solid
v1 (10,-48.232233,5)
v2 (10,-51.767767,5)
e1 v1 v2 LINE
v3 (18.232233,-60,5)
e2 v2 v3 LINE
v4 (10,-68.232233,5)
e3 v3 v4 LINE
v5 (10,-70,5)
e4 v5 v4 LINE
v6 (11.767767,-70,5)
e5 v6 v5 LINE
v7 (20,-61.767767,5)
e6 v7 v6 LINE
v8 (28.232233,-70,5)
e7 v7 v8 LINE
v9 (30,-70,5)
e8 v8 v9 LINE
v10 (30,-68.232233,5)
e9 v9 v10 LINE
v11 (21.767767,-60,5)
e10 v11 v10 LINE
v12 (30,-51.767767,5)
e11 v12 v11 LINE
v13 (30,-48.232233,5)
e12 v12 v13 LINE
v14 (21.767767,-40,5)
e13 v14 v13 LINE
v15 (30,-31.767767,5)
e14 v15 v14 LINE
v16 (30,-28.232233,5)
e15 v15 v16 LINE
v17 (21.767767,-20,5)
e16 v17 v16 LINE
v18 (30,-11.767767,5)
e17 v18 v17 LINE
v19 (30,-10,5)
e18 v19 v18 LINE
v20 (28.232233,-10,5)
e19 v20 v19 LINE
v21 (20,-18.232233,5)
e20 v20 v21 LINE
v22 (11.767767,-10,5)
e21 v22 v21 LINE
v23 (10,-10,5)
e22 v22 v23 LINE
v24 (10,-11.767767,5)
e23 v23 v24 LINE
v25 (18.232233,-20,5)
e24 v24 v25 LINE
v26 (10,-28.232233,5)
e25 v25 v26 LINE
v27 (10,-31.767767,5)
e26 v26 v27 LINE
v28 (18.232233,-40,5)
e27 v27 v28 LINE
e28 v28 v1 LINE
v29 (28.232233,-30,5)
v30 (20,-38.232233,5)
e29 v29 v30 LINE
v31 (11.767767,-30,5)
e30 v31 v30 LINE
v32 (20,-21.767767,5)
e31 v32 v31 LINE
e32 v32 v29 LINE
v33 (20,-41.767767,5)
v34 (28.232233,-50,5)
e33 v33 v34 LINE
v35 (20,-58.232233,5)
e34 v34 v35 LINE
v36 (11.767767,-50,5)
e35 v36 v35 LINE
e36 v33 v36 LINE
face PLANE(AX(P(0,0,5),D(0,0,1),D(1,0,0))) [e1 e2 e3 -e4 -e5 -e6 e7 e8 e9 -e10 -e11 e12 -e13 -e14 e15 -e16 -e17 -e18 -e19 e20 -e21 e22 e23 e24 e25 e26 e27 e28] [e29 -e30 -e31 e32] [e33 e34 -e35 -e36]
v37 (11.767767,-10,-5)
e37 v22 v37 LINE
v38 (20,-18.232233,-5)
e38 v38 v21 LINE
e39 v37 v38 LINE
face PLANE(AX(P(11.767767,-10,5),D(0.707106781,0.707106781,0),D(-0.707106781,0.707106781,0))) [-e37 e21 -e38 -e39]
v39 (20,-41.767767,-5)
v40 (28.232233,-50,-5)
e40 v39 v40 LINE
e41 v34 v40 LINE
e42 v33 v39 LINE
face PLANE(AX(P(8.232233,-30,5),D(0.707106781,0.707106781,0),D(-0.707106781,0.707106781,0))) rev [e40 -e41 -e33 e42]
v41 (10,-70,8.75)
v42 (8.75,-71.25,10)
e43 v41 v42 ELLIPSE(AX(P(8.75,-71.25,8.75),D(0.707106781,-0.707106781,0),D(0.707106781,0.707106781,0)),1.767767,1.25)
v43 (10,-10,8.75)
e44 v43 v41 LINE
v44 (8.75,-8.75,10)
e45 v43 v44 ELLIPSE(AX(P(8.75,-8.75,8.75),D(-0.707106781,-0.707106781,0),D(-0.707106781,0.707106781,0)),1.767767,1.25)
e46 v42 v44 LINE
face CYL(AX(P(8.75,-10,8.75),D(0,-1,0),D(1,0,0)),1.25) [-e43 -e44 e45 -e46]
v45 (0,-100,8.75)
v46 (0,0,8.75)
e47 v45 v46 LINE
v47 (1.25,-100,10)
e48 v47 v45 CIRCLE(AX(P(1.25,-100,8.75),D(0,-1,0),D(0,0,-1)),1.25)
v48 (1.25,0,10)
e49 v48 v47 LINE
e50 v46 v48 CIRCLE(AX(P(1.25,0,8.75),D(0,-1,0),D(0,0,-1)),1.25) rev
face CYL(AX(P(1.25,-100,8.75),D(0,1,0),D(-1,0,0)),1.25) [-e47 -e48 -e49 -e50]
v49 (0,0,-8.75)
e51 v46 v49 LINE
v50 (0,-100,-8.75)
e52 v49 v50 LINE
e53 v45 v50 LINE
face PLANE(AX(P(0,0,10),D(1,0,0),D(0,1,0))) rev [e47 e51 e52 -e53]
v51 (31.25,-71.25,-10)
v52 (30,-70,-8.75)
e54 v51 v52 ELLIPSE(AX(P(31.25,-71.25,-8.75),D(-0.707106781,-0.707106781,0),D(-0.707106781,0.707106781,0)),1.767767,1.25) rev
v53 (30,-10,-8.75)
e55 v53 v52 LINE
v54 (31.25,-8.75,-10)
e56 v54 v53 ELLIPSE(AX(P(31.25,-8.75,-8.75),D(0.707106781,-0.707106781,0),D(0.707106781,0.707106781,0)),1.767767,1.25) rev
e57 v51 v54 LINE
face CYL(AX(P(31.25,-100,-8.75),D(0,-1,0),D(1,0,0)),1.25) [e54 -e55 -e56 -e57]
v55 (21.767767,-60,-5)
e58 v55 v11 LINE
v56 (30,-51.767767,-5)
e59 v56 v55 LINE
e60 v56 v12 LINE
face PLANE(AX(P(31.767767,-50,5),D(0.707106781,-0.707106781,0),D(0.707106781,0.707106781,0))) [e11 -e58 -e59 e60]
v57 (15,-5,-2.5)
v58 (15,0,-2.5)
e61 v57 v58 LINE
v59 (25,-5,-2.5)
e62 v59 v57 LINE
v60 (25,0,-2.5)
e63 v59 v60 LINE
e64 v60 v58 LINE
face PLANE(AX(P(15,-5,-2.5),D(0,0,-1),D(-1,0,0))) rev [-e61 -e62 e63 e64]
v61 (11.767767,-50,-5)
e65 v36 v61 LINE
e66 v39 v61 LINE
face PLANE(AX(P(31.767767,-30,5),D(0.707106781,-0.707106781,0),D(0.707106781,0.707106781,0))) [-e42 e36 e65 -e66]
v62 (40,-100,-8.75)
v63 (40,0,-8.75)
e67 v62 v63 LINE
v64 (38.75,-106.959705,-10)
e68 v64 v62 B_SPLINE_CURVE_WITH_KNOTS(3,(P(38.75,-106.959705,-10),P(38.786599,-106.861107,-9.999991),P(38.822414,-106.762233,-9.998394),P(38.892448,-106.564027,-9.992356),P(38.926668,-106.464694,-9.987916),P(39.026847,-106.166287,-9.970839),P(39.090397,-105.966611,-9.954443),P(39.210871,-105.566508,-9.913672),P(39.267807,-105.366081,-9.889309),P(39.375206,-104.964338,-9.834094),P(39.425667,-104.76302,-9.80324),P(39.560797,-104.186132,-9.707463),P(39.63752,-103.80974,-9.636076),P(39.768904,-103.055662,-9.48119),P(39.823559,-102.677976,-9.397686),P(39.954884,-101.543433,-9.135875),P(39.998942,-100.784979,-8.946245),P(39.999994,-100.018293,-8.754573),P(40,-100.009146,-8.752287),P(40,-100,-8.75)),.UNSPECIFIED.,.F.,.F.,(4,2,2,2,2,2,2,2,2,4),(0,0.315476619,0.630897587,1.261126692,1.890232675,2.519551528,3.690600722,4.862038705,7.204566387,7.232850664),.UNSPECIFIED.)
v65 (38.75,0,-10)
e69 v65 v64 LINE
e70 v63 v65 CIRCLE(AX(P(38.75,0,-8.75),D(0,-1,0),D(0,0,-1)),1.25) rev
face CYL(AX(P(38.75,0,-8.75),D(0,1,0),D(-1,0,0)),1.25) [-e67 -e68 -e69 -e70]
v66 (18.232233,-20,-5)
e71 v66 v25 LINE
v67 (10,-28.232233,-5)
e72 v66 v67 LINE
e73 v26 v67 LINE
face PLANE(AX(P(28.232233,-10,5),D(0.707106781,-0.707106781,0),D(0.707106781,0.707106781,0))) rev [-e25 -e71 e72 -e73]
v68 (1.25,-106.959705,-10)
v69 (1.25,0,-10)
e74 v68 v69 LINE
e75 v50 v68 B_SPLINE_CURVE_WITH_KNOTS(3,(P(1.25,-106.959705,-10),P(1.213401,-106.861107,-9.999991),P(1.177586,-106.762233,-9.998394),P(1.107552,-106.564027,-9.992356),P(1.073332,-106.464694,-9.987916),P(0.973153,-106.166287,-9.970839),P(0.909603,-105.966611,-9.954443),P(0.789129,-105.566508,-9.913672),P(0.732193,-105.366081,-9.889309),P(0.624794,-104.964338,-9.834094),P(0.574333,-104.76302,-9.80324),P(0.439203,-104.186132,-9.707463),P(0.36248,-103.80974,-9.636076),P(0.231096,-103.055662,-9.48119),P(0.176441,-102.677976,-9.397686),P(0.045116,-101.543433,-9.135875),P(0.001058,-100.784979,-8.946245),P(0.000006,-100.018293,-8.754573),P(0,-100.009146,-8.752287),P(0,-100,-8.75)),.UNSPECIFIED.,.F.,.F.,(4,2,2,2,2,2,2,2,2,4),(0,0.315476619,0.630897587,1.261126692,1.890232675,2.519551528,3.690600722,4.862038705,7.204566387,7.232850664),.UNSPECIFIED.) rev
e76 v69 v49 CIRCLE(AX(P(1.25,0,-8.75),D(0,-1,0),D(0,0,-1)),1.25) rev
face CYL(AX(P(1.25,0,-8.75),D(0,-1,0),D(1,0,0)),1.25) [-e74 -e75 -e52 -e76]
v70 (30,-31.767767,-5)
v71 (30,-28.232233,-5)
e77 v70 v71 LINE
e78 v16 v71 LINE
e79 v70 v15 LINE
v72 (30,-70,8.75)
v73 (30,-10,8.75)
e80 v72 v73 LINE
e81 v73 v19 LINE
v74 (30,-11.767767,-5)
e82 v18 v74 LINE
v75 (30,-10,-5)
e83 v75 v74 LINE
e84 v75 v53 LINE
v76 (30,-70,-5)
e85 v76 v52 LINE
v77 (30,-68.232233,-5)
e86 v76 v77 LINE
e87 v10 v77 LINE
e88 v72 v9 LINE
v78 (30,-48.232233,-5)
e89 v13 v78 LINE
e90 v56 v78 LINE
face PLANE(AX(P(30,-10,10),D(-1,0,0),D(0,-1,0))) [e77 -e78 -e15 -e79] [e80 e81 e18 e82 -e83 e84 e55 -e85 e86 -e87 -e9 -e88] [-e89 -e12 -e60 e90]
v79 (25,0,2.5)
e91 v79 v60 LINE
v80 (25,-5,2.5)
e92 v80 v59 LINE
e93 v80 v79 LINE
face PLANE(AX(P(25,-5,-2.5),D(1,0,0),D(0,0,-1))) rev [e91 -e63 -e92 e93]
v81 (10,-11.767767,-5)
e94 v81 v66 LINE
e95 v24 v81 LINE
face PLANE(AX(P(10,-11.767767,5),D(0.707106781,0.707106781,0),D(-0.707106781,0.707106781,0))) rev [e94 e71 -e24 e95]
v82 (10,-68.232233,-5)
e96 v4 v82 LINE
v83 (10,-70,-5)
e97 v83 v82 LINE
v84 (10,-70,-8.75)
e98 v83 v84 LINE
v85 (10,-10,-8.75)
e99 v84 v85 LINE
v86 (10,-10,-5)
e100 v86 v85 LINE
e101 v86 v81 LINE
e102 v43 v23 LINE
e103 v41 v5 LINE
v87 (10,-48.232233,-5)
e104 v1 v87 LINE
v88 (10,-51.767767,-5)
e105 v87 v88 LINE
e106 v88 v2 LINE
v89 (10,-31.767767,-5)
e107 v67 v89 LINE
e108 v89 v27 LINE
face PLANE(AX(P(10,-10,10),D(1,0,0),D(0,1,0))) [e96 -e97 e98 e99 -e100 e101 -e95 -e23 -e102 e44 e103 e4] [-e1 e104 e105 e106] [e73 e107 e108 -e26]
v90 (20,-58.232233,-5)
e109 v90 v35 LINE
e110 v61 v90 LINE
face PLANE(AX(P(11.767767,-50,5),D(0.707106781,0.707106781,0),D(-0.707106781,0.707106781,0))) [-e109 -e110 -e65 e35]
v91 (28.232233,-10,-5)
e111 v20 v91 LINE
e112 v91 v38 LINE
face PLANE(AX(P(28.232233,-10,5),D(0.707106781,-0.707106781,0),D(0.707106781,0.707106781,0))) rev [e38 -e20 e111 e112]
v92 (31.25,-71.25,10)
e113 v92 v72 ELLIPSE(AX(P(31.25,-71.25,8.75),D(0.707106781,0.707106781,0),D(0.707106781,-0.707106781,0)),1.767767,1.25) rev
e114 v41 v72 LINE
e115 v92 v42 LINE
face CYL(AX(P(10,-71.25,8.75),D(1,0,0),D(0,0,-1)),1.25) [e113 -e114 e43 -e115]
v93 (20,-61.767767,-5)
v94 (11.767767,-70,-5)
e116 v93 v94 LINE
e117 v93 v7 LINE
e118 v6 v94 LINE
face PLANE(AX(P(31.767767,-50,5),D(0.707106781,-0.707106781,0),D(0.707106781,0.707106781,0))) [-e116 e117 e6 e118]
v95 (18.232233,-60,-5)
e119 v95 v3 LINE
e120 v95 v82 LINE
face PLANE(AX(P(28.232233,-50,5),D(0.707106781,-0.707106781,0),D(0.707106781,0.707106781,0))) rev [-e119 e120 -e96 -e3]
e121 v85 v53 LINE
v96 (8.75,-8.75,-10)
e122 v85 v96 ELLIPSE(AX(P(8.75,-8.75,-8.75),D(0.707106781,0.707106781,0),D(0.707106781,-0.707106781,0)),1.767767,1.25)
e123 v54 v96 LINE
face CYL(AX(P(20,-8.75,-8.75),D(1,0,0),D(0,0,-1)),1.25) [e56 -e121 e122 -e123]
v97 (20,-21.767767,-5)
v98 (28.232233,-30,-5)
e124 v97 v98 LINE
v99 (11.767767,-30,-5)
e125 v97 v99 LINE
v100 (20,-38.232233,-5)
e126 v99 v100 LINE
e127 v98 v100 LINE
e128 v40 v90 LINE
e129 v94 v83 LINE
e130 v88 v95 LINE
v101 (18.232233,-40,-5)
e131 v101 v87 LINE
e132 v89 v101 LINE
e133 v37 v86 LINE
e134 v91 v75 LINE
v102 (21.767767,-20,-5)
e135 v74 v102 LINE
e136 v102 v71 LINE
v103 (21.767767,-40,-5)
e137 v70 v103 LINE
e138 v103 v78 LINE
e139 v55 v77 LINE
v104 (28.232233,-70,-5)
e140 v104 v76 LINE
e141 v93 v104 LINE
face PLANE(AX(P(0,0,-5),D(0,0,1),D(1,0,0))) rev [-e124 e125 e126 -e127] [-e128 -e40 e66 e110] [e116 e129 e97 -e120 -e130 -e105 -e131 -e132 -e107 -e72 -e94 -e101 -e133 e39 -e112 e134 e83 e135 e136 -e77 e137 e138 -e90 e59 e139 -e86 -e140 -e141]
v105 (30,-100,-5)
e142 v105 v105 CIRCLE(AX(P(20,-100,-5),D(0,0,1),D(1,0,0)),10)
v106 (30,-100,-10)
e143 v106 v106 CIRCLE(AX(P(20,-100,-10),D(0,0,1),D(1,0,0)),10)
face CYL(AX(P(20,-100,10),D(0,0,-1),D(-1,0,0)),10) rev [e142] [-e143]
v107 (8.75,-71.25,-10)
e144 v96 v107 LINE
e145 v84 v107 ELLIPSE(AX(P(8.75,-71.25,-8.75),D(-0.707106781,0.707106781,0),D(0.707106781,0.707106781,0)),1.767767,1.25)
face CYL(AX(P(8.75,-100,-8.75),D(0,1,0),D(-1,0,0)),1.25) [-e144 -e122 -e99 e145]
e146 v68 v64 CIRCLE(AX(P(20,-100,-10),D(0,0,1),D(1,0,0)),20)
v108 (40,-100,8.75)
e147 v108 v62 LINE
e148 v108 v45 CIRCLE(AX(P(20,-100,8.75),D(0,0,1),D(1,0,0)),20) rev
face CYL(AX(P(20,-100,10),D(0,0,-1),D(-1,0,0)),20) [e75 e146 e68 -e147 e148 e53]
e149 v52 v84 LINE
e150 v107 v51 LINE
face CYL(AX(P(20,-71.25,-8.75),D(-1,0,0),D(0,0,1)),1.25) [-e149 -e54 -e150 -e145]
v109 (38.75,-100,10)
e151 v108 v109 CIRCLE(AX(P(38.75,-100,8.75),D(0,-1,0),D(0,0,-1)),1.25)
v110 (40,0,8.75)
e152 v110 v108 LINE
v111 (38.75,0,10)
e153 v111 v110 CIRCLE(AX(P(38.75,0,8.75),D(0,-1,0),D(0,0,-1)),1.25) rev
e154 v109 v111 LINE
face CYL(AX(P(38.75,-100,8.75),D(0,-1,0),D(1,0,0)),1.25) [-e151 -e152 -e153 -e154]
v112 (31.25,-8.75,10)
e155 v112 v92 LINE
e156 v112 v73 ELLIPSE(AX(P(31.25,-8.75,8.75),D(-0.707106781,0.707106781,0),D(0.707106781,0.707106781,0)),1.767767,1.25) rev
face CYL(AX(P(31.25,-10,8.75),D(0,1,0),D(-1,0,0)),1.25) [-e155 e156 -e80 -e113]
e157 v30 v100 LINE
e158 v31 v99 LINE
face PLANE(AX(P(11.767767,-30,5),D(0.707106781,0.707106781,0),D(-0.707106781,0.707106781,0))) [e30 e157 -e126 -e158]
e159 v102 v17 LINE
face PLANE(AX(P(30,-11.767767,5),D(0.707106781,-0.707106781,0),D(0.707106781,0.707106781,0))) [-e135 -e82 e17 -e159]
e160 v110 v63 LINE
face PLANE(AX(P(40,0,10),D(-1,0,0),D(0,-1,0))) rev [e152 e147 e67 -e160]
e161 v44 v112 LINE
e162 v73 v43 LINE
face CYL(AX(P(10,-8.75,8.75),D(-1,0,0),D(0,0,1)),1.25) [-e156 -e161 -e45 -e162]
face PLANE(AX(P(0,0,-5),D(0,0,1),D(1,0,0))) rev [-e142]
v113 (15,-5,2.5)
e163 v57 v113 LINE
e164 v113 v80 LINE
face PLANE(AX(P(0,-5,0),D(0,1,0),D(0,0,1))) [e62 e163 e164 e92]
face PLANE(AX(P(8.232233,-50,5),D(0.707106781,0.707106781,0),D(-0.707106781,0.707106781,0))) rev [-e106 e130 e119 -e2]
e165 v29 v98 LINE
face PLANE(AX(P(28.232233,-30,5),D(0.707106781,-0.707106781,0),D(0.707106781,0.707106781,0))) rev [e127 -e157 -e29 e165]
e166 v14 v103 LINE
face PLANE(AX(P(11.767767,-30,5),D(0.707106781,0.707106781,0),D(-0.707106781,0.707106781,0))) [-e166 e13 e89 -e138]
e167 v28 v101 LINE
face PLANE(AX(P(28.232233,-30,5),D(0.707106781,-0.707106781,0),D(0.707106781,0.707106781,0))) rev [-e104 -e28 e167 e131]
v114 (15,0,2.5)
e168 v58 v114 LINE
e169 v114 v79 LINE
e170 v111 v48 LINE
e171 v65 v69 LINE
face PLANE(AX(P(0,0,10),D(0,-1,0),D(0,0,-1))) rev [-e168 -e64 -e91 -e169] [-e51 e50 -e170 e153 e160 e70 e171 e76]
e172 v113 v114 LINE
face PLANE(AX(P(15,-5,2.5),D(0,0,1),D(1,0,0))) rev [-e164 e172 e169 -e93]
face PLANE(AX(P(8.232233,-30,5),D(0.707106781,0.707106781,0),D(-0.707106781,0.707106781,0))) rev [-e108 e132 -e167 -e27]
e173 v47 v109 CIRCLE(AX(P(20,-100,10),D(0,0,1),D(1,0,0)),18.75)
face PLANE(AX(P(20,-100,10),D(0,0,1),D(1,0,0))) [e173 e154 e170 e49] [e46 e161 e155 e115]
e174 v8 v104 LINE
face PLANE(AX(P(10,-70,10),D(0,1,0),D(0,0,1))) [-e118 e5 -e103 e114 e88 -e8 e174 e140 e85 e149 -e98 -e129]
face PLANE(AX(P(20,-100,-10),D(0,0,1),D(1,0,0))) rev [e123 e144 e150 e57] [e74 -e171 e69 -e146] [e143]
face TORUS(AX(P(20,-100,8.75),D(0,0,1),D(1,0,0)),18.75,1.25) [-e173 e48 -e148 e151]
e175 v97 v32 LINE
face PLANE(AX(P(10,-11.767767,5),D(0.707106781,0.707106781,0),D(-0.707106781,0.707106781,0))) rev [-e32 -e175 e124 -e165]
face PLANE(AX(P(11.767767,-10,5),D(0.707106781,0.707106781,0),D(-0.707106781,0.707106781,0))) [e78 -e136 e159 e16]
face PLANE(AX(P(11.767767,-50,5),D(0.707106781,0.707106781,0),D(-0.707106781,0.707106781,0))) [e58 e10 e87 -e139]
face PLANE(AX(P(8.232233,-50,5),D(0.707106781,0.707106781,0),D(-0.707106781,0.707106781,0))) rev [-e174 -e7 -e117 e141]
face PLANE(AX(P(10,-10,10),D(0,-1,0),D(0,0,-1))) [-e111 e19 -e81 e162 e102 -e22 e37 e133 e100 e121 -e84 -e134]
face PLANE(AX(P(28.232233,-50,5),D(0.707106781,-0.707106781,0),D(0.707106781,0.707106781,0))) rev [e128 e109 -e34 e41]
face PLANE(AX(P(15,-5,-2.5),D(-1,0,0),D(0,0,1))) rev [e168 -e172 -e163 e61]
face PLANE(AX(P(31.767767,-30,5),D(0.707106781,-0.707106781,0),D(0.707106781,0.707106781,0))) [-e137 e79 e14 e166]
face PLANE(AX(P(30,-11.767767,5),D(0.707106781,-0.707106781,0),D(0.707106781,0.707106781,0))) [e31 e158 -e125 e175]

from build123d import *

# Parameters (mm, degrees)
SKETCH1_R                = 10
SKETCH1_W                = 20
SKETCH1_H                = 60
BOSS_EXTRUDE1_DEPTH      = 10
BOSS_EXTRUDE2_DEPTH      = 10
BOSS_EXTRUDE2_DEPTH_BACK = 5
SKETCH1_3_R              = 10
SKETCH3_W                = 10
SKETCH3_H                = 5
CUT_EXTRUDE1_DEPTH       = 5
BOSS_EXTRUDE3_DEPTH      = 5
FILLET1_R                = 1.25


with BuildPart() as part:
    # Sketch1 → Boss-Extrude1 (new, symmetric)
    with BuildSketch(Plane.XY):
        with BuildLine():
            Line((0, 0), (40, 0))
            Line((40, 0), (40, -100))
            ThreePointArc((40, -100), (20, -120), (0, -100))
            Line((0, -100), (0, 0))
        make_face()
        with Locations((20, -100)):
            Circle(SKETCH1_R, mode=Mode.SUBTRACT)
        with Locations((20, -40)):
            Rectangle(SKETCH1_W, SKETCH1_H, mode=Mode.SUBTRACT)
    extrude(amount=BOSS_EXTRUDE1_DEPTH, both=True)

    # Sketch1<3> → Boss-Extrude2 (add, two sides: drawn at the far end of the back side and taken through both)
    with BuildSketch(Plane.XY.offset(-BOSS_EXTRUDE2_DEPTH_BACK)):
        with Locations((20, -100)):
            Circle(SKETCH1_3_R)
    extrude(amount=BOSS_EXTRUDE2_DEPTH + BOSS_EXTRUDE2_DEPTH_BACK)

    # Sketch3 → Cut-Extrude1 (cut)
    with BuildSketch(Plane(origin=(0, 0, 0), x_dir=(1, 0, 0), z_dir=(0, 1, 0))):
        with Locations((20, 0)):
            Rectangle(SKETCH3_W, SKETCH3_H)
    extrude(amount=-CUT_EXTRUDE1_DEPTH, mode=Mode.SUBTRACT)

    # Sketch4 → Boss-Extrude3 (add, symmetric)
    with BuildSketch(Plane.XY):
        Polygon((11.767766953, -10), (31.767766953, -30), (11.767766953, -50), (30, -68.232233047), (30, -70), (28.232233047, -70), (8.232233047, -50), (28.232233047, -30), (10, -11.767766953), (10, -10), align=None)
        Polygon((11.767766953, -70), (10, -70), (10, -68.232233047), (28.232233047, -50), (8.232233047, -30), (28.232233047, -10), (30, -10), (30, -11.767766953), (11.767766953, -30), (31.767766953, -50), align=None)
    extrude(amount=BOSS_EXTRUDE3_DEPTH, both=True)

    # Fillet1
    # the kernel refuses this fillet: 1.25 mm, written as the material it takes off along each edge
    with BuildSketch(Plane(origin=(40, 3.125, 10), x_dir=(-1, 0, 0), z_dir=(0, -1, 0))) as fillet1_piece_1:
        with BuildLine():
            CenterArc((FILLET1_R, FILLET1_R), FILLET1_R, 180, 90)
            Line((0, FILLET1_R), (0, 0))
            Line((0, 0), (FILLET1_R, 0))
        make_face()
    extrude(amount=103.125, mode=Mode.SUBTRACT)
    with BuildSketch(Plane(origin=(30, -10, -10), x_dir=(0, 1, 0), z_dir=(-1, 0, 0)), Plane(origin=(10, -70, -10), x_dir=(0, -1, 0), z_dir=(1, 0, 0))) as fillet1_piece_2:
        with BuildLine():
            CenterArc((FILLET1_R, -FILLET1_R), FILLET1_R, 90, 90)
            Line((0, -FILLET1_R), (0, 0))
            Line((0, 0), (FILLET1_R, 0))
        make_face()
    extrude(amount=20, mode=Mode.SUBTRACT)
    with BuildSketch(Plane(origin=(10, -10, -10), x_dir=(-1, 0, 0), z_dir=(0, -1, 0)), Plane(origin=(30, -70, -10), x_dir=(1, 0, 0), z_dir=(0, 1, 0))) as fillet1_piece_3:
        with BuildLine():
            CenterArc((FILLET1_R, -FILLET1_R), FILLET1_R, 90, 90)
            Line((0, -FILLET1_R), (0, 0))
            Line((0, 0), (FILLET1_R, 0))
        make_face()
    extrude(amount=60, mode=Mode.SUBTRACT)
    with BuildSketch(Plane(origin=(30, -10, 10), x_dir=(0, 1, 0), z_dir=(-1, 0, 0)), Plane(origin=(10, -70, 10), x_dir=(0, -1, 0), z_dir=(1, 0, 0))) as fillet1_piece_4:
        with BuildLine():
            CenterArc((FILLET1_R, FILLET1_R), FILLET1_R, 180, 90)
            Line((0, FILLET1_R), (0, 0))
            Line((0, 0), (FILLET1_R, 0))
        make_face()
    extrude(amount=20, mode=Mode.SUBTRACT)
    with BuildSketch(Plane(origin=(10, -10, 10), x_dir=(-1, 0, 0), z_dir=(0, -1, 0)), Plane(origin=(30, -70, 10), x_dir=(1, 0, 0), z_dir=(0, 1, 0))) as fillet1_piece_5:
        with BuildLine():
            CenterArc((FILLET1_R, FILLET1_R), FILLET1_R, 180, 90)
            Line((0, FILLET1_R), (0, 0))
            Line((0, 0), (FILLET1_R, 0))
        make_face()
    extrude(amount=60, mode=Mode.SUBTRACT)
    with BuildSketch(Plane(origin=(0, -100, 10), x_dir=(0, 0, -1), z_dir=(0, 1, 0))) as fillet1_piece_6:
        with BuildLine():
            CenterArc((FILLET1_R, -FILLET1_R), FILLET1_R, 90, 90)
            Line((0, -FILLET1_R), (0, 0))
            Line((0, 0), (FILLET1_R, 0))
        make_face()
    extrude(amount=103.125, mode=Mode.SUBTRACT)
    with BuildSketch(Plane(origin=(40, 3.125, -10), x_dir=(-1, 0, 0), z_dir=(0, -1, 0))) as fillet1_piece_7:
        with BuildLine():
            CenterArc((FILLET1_R, -FILLET1_R), FILLET1_R, 90, 90)
            Line((0, -FILLET1_R), (0, 0))
            Line((0, 0), (FILLET1_R, 0))
        make_face()
    extrude(amount=112.5, mode=Mode.SUBTRACT)
    with BuildSketch(Plane(origin=(0, -109.375, -10), x_dir=(0, 0, 1), z_dir=(0, 1, 0))) as fillet1_piece_8:
        with BuildLine():
            CenterArc((FILLET1_R, FILLET1_R), FILLET1_R, 180, 90)
            Line((0, FILLET1_R), (0, 0))
            Line((0, 0), (FILLET1_R, 0))
        make_face()
    extrude(amount=112.5, mode=Mode.SUBTRACT)
    with BuildSketch(Plane(origin=(20, -100, 10), x_dir=(1, 0, 0), z_dir=(0, 1, 0))) as fillet1_piece_9:
        with BuildLine():
            CenterArc((20 - FILLET1_R, FILLET1_R), FILLET1_R, 270, 90)
            Line((20 - FILLET1_R, 0), (20, 0))
            Line((20, 0), (20, FILLET1_R))
        make_face()
    revolve(axis=Axis((20, -100, 10), (0, 0, -1)), revolution_arc=180, mode=Mode.SUBTRACT)
    with BuildSketch(Plane(origin=(30, -70, -10), x_dir=(1, 0, 0), z_dir=(0, 1, 0))) as fillet1_piece_10a_section:
        with BuildLine():
            CenterArc((FILLET1_R, -FILLET1_R), FILLET1_R, 90, 90)
            Line((0, -FILLET1_R), (0, 0))
            Line((0, 0), (FILLET1_R, 0))
        make_face()
    fillet1_piece_10a = extrude(amount=63.125, mode=Mode.PRIVATE)
    fillet1_piece_10a = split(fillet1_piece_10a, bisect_by=Plane(origin=(30, -10, -10), z_dir=(0, 1, 0)), keep=Keep.TOP, mode=Mode.PRIVATE)
    with BuildSketch(Plane(origin=(33.125, -10, -10), x_dir=(0, 1, 0), z_dir=(-1, 0, 0))) as fillet1_piece_10b_section:
        with BuildLine():
            CenterArc((FILLET1_R, -FILLET1_R), FILLET1_R, 90, 90)
            Line((0, -FILLET1_R), (0, 0))
            Line((0, 0), (FILLET1_R, 0))
        make_face()
    fillet1_piece_10b = extrude(amount=23.125, mode=Mode.PRIVATE)
    fillet1_piece_10b = split(fillet1_piece_10b, bisect_by=Plane(origin=(30, -10, -10), z_dir=(1, 0, 0)), keep=Keep.TOP, mode=Mode.PRIVATE)
    fillet1_piece_10 = fillet1_piece_10a & fillet1_piece_10b
    add(fillet1_piece_10, mode=Mode.SUBTRACT)
    with BuildSketch(Plane(origin=(10, -6.875, -10), x_dir=(-1, 0, 0), z_dir=(0, -1, 0))) as fillet1_piece_11a_section:
        with BuildLine():
            CenterArc((FILLET1_R, -FILLET1_R), FILLET1_R, 90, 90)
            Line((0, -FILLET1_R), (0, 0))
            Line((0, 0), (FILLET1_R, 0))
        make_face()
    fillet1_piece_11a = extrude(amount=63.125, mode=Mode.PRIVATE)
    fillet1_piece_11a = split(fillet1_piece_11a, bisect_by=Plane(origin=(10, -10, -10), z_dir=(0, 1, 0)), keep=Keep.TOP, mode=Mode.PRIVATE)
    with BuildSketch(Plane(origin=(30, -10, -10), x_dir=(0, 1, 0), z_dir=(-1, 0, 0))) as fillet1_piece_11b_section:
        with BuildLine():
            CenterArc((FILLET1_R, -FILLET1_R), FILLET1_R, 90, 90)
            Line((0, -FILLET1_R), (0, 0))
            Line((0, 0), (FILLET1_R, 0))
        make_face()
    fillet1_piece_11b = extrude(amount=23.125, mode=Mode.PRIVATE)
    fillet1_piece_11b = split(fillet1_piece_11b, bisect_by=Plane(origin=(10, -10, -10), z_dir=(-1, 0, 0)), keep=Keep.TOP, mode=Mode.PRIVATE)
    fillet1_piece_11 = fillet1_piece_11a & fillet1_piece_11b
    add(fillet1_piece_11, mode=Mode.SUBTRACT)
    with BuildSketch(Plane(origin=(10, -10, -10), x_dir=(-1, 0, 0), z_dir=(0, -1, 0))) as fillet1_piece_12a_section:
        with BuildLine():
            CenterArc((FILLET1_R, -FILLET1_R), FILLET1_R, 90, 90)
            Line((0, -FILLET1_R), (0, 0))
            Line((0, 0), (FILLET1_R, 0))
        make_face()
    fillet1_piece_12a = extrude(amount=63.125, mode=Mode.PRIVATE)
    fillet1_piece_12a = split(fillet1_piece_12a, bisect_by=Plane(origin=(10, -70, -10), z_dir=(0, -1, 0)), keep=Keep.TOP, mode=Mode.PRIVATE)
    with BuildSketch(Plane(origin=(6.875, -70, -10), x_dir=(0, -1, 0), z_dir=(1, 0, 0))) as fillet1_piece_12b_section:
        with BuildLine():
            CenterArc((FILLET1_R, -FILLET1_R), FILLET1_R, 90, 90)
            Line((0, -FILLET1_R), (0, 0))
            Line((0, 0), (FILLET1_R, 0))
        make_face()
    fillet1_piece_12b = extrude(amount=23.125, mode=Mode.PRIVATE)
    fillet1_piece_12b = split(fillet1_piece_12b, bisect_by=Plane(origin=(10, -70, -10), z_dir=(-1, 0, 0)), keep=Keep.TOP, mode=Mode.PRIVATE)
    fillet1_piece_12 = fillet1_piece_12a & fillet1_piece_12b
    add(fillet1_piece_12, mode=Mode.SUBTRACT)
    with BuildSketch(Plane(origin=(10, -70, -10), x_dir=(0, -1, 0), z_dir=(1, 0, 0))) as fillet1_piece_13a_section:
        with BuildLine():
            CenterArc((FILLET1_R, -FILLET1_R), FILLET1_R, 90, 90)
            Line((0, -FILLET1_R), (0, 0))
            Line((0, 0), (FILLET1_R, 0))
        make_face()
    fillet1_piece_13a = extrude(amount=23.125, mode=Mode.PRIVATE)
    fillet1_piece_13a = split(fillet1_piece_13a, bisect_by=Plane(origin=(30, -70, -10), z_dir=(1, 0, 0)), keep=Keep.TOP, mode=Mode.PRIVATE)
    with BuildSketch(Plane(origin=(30, -73.125, -10), x_dir=(1, 0, 0), z_dir=(0, 1, 0))) as fillet1_piece_13b_section:
        with BuildLine():
            CenterArc((FILLET1_R, -FILLET1_R), FILLET1_R, 90, 90)
            Line((0, -FILLET1_R), (0, 0))
            Line((0, 0), (FILLET1_R, 0))
        make_face()
    fillet1_piece_13b = extrude(amount=63.125, mode=Mode.PRIVATE)
    fillet1_piece_13b = split(fillet1_piece_13b, bisect_by=Plane(origin=(30, -70, -10), z_dir=(0, -1, 0)), keep=Keep.TOP, mode=Mode.PRIVATE)
    fillet1_piece_13 = fillet1_piece_13a & fillet1_piece_13b
    add(fillet1_piece_13, mode=Mode.SUBTRACT)
    with BuildSketch(Plane(origin=(30, -70, 10), x_dir=(1, 0, 0), z_dir=(0, 1, 0))) as fillet1_piece_14a_section:
        with BuildLine():
            CenterArc((FILLET1_R, FILLET1_R), FILLET1_R, 180, 90)
            Line((0, FILLET1_R), (0, 0))
            Line((0, 0), (FILLET1_R, 0))
        make_face()
    fillet1_piece_14a = extrude(amount=63.125, mode=Mode.PRIVATE)
    fillet1_piece_14a = split(fillet1_piece_14a, bisect_by=Plane(origin=(30, -10, 10), z_dir=(0, 1, 0)), keep=Keep.TOP, mode=Mode.PRIVATE)
    with BuildSketch(Plane(origin=(33.125, -10, 10), x_dir=(0, 1, 0), z_dir=(-1, 0, 0))) as fillet1_piece_14b_section:
        with BuildLine():
            CenterArc((FILLET1_R, FILLET1_R), FILLET1_R, 180, 90)
            Line((0, FILLET1_R), (0, 0))
            Line((0, 0), (FILLET1_R, 0))
        make_face()
    fillet1_piece_14b = extrude(amount=23.125, mode=Mode.PRIVATE)
    fillet1_piece_14b = split(fillet1_piece_14b, bisect_by=Plane(origin=(30, -10, 10), z_dir=(1, 0, 0)), keep=Keep.TOP, mode=Mode.PRIVATE)
    fillet1_piece_14 = fillet1_piece_14a & fillet1_piece_14b
    add(fillet1_piece_14, mode=Mode.SUBTRACT)
    with BuildSketch(Plane(origin=(10, -6.875, 10), x_dir=(-1, 0, 0), z_dir=(0, -1, 0))) as fillet1_piece_15a_section:
        with BuildLine():
            CenterArc((FILLET1_R, FILLET1_R), FILLET1_R, 180, 90)
            Line((0, FILLET1_R), (0, 0))
            Line((0, 0), (FILLET1_R, 0))
        make_face()
    fillet1_piece_15a = extrude(amount=63.125, mode=Mode.PRIVATE)
    fillet1_piece_15a = split(fillet1_piece_15a, bisect_by=Plane(origin=(10, -10, 10), z_dir=(0, 1, 0)), keep=Keep.TOP, mode=Mode.PRIVATE)
    with BuildSketch(Plane(origin=(30, -10, 10), x_dir=(0, 1, 0), z_dir=(-1, 0, 0))) as fillet1_piece_15b_section:
        with BuildLine():
            CenterArc((FILLET1_R, FILLET1_R), FILLET1_R, 180, 90)
            Line((0, FILLET1_R), (0, 0))
            Line((0, 0), (FILLET1_R, 0))
        make_face()
    fillet1_piece_15b = extrude(amount=23.125, mode=Mode.PRIVATE)
    fillet1_piece_15b = split(fillet1_piece_15b, bisect_by=Plane(origin=(10, -10, 10), z_dir=(-1, 0, 0)), keep=Keep.TOP, mode=Mode.PRIVATE)
    fillet1_piece_15 = fillet1_piece_15a & fillet1_piece_15b
    add(fillet1_piece_15, mode=Mode.SUBTRACT)
    with BuildSketch(Plane(origin=(10, -10, 10), x_dir=(-1, 0, 0), z_dir=(0, -1, 0))) as fillet1_piece_16a_section:
        with BuildLine():
            CenterArc((FILLET1_R, FILLET1_R), FILLET1_R, 180, 90)
            Line((0, FILLET1_R), (0, 0))
            Line((0, 0), (FILLET1_R, 0))
        make_face()
    fillet1_piece_16a = extrude(amount=63.125, mode=Mode.PRIVATE)
    fillet1_piece_16a = split(fillet1_piece_16a, bisect_by=Plane(origin=(10, -70, 10), z_dir=(0, -1, 0)), keep=Keep.TOP, mode=Mode.PRIVATE)
    with BuildSketch(Plane(origin=(6.875, -70, 10), x_dir=(0, -1, 0), z_dir=(1, 0, 0))) as fillet1_piece_16b_section:
        with BuildLine():
            CenterArc((FILLET1_R, FILLET1_R), FILLET1_R, 180, 90)
            Line((0, FILLET1_R), (0, 0))
            Line((0, 0), (FILLET1_R, 0))
        make_face()
    fillet1_piece_16b = extrude(amount=23.125, mode=Mode.PRIVATE)
    fillet1_piece_16b = split(fillet1_piece_16b, bisect_by=Plane(origin=(10, -70, 10), z_dir=(-1, 0, 0)), keep=Keep.TOP, mode=Mode.PRIVATE)
    fillet1_piece_16 = fillet1_piece_16a & fillet1_piece_16b
    add(fillet1_piece_16, mode=Mode.SUBTRACT)
    with BuildSketch(Plane(origin=(10, -70, 10), x_dir=(0, -1, 0), z_dir=(1, 0, 0))) as fillet1_piece_17a_section:
        with BuildLine():
            CenterArc((FILLET1_R, FILLET1_R), FILLET1_R, 180, 90)
            Line((0, FILLET1_R), (0, 0))
            Line((0, 0), (FILLET1_R, 0))
        make_face()
    fillet1_piece_17a = extrude(amount=23.125, mode=Mode.PRIVATE)
    fillet1_piece_17a = split(fillet1_piece_17a, bisect_by=Plane(origin=(30, -70, 10), z_dir=(1, 0, 0)), keep=Keep.TOP, mode=Mode.PRIVATE)
    with BuildSketch(Plane(origin=(30, -73.125, 10), x_dir=(1, 0, 0), z_dir=(0, 1, 0))) as fillet1_piece_17b_section:
        with BuildLine():
            CenterArc((FILLET1_R, FILLET1_R), FILLET1_R, 180, 90)
            Line((0, FILLET1_R), (0, 0))
            Line((0, 0), (FILLET1_R, 0))
        make_face()
    fillet1_piece_17b = extrude(amount=63.125, mode=Mode.PRIVATE)
    fillet1_piece_17b = split(fillet1_piece_17b, bisect_by=Plane(origin=(30, -70, 10), z_dir=(0, -1, 0)), keep=Keep.TOP, mode=Mode.PRIVATE)
    fillet1_piece_17 = fillet1_piece_17a & fillet1_piece_17b
    add(fillet1_piece_17, mode=Mode.SUBTRACT)


solid = part.part
